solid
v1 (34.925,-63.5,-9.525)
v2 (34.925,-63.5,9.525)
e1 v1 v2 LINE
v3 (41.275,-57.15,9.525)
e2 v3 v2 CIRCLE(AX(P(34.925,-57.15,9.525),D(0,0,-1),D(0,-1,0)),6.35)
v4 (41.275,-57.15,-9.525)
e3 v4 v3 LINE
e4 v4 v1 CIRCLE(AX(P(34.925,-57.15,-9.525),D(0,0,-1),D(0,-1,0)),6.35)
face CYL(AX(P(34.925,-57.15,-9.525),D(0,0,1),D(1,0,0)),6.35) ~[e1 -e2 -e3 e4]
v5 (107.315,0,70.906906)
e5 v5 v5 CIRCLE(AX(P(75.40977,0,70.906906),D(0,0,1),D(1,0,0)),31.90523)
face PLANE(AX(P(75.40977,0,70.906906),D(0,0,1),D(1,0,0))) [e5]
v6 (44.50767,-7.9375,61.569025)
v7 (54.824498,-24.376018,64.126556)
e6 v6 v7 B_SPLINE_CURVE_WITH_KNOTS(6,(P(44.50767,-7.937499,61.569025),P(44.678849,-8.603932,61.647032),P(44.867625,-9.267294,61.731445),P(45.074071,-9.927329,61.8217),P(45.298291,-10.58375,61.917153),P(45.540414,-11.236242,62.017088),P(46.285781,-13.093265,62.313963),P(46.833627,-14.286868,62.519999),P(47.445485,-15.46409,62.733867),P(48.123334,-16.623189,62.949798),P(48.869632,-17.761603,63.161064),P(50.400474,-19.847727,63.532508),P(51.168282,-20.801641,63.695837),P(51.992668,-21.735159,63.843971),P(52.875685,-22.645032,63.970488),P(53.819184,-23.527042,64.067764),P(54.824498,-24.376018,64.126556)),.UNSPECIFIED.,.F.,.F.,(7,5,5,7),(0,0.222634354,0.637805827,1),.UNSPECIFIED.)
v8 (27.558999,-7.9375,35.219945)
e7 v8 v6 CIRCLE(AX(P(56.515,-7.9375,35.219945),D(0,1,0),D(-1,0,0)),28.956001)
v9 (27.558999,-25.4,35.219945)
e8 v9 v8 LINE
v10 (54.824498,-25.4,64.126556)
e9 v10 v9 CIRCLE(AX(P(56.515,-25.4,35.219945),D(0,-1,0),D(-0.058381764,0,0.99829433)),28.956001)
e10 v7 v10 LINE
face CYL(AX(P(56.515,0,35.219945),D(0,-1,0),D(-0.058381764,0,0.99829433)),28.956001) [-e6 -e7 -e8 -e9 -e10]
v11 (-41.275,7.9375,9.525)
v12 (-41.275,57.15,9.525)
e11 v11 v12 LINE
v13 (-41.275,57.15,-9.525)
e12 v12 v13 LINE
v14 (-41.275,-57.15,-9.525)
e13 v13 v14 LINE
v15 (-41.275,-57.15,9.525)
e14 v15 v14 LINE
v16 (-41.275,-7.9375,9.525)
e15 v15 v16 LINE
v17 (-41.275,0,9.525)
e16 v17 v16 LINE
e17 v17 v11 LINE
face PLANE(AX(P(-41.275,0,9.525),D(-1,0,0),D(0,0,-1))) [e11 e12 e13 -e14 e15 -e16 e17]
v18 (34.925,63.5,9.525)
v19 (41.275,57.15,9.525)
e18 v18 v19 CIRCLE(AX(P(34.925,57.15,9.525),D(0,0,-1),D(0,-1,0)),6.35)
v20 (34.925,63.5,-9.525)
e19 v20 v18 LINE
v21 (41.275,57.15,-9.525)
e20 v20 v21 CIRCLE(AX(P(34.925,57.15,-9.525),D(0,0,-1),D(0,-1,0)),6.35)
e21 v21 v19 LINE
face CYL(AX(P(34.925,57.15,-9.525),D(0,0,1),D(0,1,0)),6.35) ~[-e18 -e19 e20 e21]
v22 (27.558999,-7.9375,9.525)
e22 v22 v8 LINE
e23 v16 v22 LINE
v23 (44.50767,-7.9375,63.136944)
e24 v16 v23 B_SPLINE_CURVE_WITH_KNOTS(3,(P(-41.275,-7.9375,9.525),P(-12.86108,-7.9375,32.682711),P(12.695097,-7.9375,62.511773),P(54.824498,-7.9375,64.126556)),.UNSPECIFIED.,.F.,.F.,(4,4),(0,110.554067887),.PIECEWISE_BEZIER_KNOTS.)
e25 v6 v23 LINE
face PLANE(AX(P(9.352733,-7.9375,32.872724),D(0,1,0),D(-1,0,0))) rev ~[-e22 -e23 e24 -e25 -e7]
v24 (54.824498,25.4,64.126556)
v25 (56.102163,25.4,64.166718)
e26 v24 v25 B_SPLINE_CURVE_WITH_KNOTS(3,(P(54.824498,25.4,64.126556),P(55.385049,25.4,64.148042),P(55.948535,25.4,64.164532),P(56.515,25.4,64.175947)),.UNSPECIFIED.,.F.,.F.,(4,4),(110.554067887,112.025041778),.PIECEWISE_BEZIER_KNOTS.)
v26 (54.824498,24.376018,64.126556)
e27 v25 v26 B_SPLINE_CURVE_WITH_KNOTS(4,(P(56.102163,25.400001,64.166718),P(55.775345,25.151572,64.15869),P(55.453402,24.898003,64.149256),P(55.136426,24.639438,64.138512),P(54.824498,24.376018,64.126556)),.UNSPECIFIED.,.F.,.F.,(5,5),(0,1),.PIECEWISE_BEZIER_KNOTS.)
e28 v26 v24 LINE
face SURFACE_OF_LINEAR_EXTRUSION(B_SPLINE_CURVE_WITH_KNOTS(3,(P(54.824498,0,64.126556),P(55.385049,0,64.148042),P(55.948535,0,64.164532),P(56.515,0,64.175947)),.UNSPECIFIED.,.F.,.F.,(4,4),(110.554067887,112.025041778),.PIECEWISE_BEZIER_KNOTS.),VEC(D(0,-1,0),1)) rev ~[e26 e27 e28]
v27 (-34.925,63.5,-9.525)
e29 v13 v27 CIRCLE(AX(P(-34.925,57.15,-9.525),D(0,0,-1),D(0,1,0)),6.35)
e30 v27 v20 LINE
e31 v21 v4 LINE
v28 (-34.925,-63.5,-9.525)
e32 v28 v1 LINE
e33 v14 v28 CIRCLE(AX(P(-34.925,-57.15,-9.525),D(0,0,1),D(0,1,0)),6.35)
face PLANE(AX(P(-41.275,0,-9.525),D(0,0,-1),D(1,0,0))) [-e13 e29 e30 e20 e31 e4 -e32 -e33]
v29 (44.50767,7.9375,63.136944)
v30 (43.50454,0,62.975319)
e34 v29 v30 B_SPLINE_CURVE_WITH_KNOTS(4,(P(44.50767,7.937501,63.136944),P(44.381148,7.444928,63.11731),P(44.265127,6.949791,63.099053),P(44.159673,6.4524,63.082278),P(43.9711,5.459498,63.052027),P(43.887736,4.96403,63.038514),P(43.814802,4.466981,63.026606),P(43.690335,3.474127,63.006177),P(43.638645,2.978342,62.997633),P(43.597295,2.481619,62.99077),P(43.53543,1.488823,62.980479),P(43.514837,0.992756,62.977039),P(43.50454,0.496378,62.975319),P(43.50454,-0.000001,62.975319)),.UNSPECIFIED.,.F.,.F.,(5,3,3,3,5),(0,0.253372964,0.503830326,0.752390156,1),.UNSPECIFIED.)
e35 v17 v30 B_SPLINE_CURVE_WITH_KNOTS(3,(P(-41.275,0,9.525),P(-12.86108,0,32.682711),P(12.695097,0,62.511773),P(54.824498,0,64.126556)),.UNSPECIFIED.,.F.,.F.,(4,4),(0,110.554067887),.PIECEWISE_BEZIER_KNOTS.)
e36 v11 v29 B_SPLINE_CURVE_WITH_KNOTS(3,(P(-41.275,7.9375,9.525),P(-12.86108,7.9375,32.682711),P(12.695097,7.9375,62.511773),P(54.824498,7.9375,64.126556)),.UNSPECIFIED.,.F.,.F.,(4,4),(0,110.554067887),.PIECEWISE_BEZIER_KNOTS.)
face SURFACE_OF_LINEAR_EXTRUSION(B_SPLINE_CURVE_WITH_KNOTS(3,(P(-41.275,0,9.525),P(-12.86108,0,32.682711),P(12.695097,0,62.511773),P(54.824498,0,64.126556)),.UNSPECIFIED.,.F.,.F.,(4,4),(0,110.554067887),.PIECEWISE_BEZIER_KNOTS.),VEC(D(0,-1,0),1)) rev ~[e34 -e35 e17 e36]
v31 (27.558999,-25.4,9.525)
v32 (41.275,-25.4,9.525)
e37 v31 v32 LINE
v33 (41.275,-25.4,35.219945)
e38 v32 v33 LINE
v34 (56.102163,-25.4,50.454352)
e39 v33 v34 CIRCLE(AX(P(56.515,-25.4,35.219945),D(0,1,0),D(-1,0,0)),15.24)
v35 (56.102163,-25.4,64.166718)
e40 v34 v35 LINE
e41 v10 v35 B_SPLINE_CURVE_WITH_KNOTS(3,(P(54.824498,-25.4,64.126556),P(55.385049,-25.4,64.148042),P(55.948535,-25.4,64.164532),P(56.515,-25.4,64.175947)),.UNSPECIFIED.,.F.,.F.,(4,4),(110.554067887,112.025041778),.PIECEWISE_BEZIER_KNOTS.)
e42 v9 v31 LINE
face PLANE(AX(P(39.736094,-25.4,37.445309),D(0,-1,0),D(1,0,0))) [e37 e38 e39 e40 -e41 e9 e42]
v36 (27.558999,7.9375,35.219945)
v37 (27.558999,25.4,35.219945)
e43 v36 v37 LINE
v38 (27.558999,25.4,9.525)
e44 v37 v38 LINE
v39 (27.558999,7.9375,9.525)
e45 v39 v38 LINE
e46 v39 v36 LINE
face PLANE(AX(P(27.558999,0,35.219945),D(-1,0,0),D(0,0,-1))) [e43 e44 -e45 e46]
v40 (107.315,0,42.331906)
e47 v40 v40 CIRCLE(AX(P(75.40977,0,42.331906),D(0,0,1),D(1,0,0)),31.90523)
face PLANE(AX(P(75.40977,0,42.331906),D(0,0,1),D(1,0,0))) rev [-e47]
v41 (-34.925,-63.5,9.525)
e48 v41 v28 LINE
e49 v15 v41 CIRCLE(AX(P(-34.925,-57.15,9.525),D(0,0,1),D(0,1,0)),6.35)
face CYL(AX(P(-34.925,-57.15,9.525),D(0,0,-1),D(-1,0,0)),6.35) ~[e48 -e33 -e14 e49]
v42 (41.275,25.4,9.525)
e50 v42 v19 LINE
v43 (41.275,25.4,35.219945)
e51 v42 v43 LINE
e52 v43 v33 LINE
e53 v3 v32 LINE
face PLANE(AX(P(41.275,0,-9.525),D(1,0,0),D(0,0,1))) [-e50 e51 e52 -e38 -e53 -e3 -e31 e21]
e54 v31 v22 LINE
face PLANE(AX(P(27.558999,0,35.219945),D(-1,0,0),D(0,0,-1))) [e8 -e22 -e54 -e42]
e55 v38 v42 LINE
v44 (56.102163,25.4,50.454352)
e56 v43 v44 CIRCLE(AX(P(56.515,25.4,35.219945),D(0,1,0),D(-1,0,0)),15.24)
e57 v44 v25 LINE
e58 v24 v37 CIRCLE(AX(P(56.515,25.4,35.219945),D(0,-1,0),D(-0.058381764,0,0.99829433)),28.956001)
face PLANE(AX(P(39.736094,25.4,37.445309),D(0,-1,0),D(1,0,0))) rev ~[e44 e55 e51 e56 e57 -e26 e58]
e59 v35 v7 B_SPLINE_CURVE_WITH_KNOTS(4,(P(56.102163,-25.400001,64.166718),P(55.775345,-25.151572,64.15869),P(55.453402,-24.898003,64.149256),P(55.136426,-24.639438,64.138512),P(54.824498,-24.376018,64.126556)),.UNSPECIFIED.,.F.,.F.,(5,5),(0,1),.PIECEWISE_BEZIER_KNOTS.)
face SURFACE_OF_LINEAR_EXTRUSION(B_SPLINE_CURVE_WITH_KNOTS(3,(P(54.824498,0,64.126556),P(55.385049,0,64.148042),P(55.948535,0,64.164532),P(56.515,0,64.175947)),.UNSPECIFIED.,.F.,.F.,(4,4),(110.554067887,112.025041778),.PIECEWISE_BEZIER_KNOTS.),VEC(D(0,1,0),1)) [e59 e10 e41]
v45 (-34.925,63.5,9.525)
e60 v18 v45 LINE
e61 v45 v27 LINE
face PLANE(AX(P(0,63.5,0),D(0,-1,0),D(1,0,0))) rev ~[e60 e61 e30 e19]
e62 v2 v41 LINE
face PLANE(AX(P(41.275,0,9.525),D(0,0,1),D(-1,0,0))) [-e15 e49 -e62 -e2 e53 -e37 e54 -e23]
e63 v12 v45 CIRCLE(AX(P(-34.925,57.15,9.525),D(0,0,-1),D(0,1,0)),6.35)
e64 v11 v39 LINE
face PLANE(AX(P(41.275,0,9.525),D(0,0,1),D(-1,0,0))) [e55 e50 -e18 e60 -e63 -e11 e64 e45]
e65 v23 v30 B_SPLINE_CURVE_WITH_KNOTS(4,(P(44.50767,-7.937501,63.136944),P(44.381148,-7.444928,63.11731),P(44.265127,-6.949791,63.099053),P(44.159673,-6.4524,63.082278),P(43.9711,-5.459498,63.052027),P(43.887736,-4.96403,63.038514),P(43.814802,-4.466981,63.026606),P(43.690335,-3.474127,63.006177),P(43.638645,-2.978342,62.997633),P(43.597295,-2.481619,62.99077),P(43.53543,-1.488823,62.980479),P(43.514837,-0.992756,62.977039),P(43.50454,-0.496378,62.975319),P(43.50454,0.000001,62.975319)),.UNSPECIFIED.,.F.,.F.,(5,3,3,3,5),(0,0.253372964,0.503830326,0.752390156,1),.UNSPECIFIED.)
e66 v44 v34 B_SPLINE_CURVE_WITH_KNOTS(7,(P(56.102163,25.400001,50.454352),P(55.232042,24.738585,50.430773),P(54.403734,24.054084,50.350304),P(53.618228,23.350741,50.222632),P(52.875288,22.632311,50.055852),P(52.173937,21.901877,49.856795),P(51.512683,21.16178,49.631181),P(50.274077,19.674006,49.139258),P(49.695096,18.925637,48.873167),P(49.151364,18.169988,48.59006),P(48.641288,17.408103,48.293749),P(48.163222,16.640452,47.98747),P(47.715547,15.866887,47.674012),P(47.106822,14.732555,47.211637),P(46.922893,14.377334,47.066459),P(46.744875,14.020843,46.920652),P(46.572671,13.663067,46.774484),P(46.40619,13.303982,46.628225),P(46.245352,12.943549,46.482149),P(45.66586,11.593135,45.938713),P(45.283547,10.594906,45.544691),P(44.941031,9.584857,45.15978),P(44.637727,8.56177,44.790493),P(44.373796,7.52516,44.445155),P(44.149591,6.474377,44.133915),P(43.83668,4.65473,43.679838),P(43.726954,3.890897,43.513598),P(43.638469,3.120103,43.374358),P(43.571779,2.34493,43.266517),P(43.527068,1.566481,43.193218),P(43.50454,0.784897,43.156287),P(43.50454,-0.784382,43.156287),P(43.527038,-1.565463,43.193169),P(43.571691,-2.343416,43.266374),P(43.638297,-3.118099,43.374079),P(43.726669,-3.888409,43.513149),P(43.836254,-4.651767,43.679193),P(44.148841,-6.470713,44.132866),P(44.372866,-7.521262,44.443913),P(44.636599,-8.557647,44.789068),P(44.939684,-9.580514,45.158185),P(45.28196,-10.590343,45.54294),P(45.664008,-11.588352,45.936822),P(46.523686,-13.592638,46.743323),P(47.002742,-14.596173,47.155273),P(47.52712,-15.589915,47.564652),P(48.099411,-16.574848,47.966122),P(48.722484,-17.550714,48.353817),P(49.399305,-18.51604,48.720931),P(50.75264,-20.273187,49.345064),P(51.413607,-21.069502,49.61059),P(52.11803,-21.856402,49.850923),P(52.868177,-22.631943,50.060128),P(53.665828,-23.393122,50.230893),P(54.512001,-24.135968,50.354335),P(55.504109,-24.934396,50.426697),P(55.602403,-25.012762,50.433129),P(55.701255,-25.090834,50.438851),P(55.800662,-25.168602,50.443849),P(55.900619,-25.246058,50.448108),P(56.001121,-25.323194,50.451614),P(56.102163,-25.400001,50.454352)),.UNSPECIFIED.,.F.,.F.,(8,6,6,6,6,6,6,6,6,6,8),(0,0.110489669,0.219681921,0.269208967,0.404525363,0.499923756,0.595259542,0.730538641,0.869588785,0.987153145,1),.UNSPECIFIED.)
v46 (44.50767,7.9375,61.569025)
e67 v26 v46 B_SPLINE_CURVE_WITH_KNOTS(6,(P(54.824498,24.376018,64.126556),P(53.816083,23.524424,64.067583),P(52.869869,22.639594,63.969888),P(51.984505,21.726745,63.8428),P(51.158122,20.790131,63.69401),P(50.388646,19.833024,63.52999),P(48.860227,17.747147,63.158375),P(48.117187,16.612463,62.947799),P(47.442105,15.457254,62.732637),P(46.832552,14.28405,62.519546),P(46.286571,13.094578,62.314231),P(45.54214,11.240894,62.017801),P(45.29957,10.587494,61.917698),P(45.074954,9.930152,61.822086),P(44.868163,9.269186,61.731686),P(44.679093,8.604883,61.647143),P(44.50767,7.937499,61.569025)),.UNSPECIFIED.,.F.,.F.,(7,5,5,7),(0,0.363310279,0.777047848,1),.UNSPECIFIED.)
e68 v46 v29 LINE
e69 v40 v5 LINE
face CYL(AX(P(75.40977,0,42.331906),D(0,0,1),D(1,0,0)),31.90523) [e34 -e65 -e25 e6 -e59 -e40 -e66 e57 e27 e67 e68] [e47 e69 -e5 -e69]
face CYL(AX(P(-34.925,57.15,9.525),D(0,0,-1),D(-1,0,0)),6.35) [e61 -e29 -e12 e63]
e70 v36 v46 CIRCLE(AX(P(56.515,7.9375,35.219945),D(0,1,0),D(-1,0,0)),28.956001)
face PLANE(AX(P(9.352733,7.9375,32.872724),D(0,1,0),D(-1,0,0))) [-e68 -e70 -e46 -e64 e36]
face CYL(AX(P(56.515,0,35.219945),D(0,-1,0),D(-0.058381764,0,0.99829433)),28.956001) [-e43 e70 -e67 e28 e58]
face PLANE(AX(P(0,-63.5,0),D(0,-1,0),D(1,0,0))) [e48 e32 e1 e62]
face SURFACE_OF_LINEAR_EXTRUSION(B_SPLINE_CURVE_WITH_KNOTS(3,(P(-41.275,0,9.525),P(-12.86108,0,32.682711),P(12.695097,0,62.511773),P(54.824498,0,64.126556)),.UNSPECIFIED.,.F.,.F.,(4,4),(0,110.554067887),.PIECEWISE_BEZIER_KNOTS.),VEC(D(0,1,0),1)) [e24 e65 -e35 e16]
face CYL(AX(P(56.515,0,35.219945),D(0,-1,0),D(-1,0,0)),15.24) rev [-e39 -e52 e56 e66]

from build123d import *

# Parameters (mm, degrees)
F1_DEPTH = 63.5
F2_DEPTH = 7.9375
F3_DEPTH = 25.4
F4_R     = 6.35


# Not quite as in the source:
# - ends of sketch curves that miss each other by under 0.0002 mm in the source are joined


with BuildPart() as f1:
    # F0 (on Front) → F1 (new body, symmetric)
    with BuildSketch(Plane.XZ):
        Polygon((-41.275, 9.525), (-41.275, -9.525), (41.275, -9.525), (41.275, 9.525), (27.5589991361, 9.525), align=None)
    extrude(amount=F1_DEPTH, both=True)

    # F0 (on Front) → F2 (join, symmetric)
    with BuildSketch(Plane.XZ):
        with BuildLine():
            add(Edge.make_bspline(
                [(-41.275, 9.525), (-12.8610799571, 32.6827113613), (12.6950968294, 62.5117734864), (54.8244975817, 64.1265564996)],
                knots=[0, 0, 0, 0, 110.5540678871, 110.5540678871, 110.5540678871, 110.5540678871], degree=3))
            Line((-41.275, 9.525), (27.5589991361, 9.525))
            Line((27.5589991361, 9.525), (27.5589991361, 35.2199450135))
            ThreePointArc((27.5589991361, 35.2199450135), (35.450810299, 55.0882589398), (54.8244975817, 64.1265564996))
        make_face()
    extrude(amount=F2_DEPTH, both=True)

    # F0 (on Front) → F3 (join, symmetric)
    with BuildSketch(Plane.XZ):
        with BuildLine():
            Line((27.5589991361, 9.525), (41.275, 9.525))
            Line((41.275, 9.525), (41.275, 35.2199450135))
            ThreePointArc((41.275, 35.2199450135), (45.7386926547, 45.9962523588), (56.515, 50.4599450135))
            Line((56.515, 50.4599450135), (56.515, 64.1759467518))
            add(Edge.make_bspline(
                [(54.8244975817, 64.1265564996), (55.3850490812, 64.1480419473), (55.9485346305, 64.1645324648), (56.515, 64.1759467518)],
                knots=[110.5540678871, 110.5540678871, 110.5540678871, 110.5540678871, 112.0250417777, 112.0250417777, 112.0250417777, 112.0250417777], degree=3))
            ThreePointArc((54.8244975817, 64.1265564996), (35.450810299, 55.0882589398), (27.5589991361, 35.2199450135))
            Line((27.5589991361, 35.2199450135), (27.5589991361, 9.525))
        make_face()
    extrude(amount=F3_DEPTH, both=True)

    # F4
    f4_edges = [f1.edges().sort_by_distance(p)[0] for p in [
        (-41.275, -63.5, 0),
        (41.275, -63.5, 0),
        (41.275, 63.5, 0),
        (-41.275, 63.5, 0),
    ]]
    fillet(f4_edges, radius=F4_R)

    # F0 (on Front) → F5 (revolve)
    with BuildSketch(Plane.XZ):
        Polygon((75.4097700119, 70.9069057465), (75.4097700119, 64.1759485006), (75.4097700119, 50.4599450135), (75.4097700119, 42.3319057465), (107.315, 42.3319057465), (107.315, 70.9069057465), align=None)
    revolve(axis=Axis((75.4097700119, 0, 56.6194057465), (0, 0, 1)))


solid = f1.part
